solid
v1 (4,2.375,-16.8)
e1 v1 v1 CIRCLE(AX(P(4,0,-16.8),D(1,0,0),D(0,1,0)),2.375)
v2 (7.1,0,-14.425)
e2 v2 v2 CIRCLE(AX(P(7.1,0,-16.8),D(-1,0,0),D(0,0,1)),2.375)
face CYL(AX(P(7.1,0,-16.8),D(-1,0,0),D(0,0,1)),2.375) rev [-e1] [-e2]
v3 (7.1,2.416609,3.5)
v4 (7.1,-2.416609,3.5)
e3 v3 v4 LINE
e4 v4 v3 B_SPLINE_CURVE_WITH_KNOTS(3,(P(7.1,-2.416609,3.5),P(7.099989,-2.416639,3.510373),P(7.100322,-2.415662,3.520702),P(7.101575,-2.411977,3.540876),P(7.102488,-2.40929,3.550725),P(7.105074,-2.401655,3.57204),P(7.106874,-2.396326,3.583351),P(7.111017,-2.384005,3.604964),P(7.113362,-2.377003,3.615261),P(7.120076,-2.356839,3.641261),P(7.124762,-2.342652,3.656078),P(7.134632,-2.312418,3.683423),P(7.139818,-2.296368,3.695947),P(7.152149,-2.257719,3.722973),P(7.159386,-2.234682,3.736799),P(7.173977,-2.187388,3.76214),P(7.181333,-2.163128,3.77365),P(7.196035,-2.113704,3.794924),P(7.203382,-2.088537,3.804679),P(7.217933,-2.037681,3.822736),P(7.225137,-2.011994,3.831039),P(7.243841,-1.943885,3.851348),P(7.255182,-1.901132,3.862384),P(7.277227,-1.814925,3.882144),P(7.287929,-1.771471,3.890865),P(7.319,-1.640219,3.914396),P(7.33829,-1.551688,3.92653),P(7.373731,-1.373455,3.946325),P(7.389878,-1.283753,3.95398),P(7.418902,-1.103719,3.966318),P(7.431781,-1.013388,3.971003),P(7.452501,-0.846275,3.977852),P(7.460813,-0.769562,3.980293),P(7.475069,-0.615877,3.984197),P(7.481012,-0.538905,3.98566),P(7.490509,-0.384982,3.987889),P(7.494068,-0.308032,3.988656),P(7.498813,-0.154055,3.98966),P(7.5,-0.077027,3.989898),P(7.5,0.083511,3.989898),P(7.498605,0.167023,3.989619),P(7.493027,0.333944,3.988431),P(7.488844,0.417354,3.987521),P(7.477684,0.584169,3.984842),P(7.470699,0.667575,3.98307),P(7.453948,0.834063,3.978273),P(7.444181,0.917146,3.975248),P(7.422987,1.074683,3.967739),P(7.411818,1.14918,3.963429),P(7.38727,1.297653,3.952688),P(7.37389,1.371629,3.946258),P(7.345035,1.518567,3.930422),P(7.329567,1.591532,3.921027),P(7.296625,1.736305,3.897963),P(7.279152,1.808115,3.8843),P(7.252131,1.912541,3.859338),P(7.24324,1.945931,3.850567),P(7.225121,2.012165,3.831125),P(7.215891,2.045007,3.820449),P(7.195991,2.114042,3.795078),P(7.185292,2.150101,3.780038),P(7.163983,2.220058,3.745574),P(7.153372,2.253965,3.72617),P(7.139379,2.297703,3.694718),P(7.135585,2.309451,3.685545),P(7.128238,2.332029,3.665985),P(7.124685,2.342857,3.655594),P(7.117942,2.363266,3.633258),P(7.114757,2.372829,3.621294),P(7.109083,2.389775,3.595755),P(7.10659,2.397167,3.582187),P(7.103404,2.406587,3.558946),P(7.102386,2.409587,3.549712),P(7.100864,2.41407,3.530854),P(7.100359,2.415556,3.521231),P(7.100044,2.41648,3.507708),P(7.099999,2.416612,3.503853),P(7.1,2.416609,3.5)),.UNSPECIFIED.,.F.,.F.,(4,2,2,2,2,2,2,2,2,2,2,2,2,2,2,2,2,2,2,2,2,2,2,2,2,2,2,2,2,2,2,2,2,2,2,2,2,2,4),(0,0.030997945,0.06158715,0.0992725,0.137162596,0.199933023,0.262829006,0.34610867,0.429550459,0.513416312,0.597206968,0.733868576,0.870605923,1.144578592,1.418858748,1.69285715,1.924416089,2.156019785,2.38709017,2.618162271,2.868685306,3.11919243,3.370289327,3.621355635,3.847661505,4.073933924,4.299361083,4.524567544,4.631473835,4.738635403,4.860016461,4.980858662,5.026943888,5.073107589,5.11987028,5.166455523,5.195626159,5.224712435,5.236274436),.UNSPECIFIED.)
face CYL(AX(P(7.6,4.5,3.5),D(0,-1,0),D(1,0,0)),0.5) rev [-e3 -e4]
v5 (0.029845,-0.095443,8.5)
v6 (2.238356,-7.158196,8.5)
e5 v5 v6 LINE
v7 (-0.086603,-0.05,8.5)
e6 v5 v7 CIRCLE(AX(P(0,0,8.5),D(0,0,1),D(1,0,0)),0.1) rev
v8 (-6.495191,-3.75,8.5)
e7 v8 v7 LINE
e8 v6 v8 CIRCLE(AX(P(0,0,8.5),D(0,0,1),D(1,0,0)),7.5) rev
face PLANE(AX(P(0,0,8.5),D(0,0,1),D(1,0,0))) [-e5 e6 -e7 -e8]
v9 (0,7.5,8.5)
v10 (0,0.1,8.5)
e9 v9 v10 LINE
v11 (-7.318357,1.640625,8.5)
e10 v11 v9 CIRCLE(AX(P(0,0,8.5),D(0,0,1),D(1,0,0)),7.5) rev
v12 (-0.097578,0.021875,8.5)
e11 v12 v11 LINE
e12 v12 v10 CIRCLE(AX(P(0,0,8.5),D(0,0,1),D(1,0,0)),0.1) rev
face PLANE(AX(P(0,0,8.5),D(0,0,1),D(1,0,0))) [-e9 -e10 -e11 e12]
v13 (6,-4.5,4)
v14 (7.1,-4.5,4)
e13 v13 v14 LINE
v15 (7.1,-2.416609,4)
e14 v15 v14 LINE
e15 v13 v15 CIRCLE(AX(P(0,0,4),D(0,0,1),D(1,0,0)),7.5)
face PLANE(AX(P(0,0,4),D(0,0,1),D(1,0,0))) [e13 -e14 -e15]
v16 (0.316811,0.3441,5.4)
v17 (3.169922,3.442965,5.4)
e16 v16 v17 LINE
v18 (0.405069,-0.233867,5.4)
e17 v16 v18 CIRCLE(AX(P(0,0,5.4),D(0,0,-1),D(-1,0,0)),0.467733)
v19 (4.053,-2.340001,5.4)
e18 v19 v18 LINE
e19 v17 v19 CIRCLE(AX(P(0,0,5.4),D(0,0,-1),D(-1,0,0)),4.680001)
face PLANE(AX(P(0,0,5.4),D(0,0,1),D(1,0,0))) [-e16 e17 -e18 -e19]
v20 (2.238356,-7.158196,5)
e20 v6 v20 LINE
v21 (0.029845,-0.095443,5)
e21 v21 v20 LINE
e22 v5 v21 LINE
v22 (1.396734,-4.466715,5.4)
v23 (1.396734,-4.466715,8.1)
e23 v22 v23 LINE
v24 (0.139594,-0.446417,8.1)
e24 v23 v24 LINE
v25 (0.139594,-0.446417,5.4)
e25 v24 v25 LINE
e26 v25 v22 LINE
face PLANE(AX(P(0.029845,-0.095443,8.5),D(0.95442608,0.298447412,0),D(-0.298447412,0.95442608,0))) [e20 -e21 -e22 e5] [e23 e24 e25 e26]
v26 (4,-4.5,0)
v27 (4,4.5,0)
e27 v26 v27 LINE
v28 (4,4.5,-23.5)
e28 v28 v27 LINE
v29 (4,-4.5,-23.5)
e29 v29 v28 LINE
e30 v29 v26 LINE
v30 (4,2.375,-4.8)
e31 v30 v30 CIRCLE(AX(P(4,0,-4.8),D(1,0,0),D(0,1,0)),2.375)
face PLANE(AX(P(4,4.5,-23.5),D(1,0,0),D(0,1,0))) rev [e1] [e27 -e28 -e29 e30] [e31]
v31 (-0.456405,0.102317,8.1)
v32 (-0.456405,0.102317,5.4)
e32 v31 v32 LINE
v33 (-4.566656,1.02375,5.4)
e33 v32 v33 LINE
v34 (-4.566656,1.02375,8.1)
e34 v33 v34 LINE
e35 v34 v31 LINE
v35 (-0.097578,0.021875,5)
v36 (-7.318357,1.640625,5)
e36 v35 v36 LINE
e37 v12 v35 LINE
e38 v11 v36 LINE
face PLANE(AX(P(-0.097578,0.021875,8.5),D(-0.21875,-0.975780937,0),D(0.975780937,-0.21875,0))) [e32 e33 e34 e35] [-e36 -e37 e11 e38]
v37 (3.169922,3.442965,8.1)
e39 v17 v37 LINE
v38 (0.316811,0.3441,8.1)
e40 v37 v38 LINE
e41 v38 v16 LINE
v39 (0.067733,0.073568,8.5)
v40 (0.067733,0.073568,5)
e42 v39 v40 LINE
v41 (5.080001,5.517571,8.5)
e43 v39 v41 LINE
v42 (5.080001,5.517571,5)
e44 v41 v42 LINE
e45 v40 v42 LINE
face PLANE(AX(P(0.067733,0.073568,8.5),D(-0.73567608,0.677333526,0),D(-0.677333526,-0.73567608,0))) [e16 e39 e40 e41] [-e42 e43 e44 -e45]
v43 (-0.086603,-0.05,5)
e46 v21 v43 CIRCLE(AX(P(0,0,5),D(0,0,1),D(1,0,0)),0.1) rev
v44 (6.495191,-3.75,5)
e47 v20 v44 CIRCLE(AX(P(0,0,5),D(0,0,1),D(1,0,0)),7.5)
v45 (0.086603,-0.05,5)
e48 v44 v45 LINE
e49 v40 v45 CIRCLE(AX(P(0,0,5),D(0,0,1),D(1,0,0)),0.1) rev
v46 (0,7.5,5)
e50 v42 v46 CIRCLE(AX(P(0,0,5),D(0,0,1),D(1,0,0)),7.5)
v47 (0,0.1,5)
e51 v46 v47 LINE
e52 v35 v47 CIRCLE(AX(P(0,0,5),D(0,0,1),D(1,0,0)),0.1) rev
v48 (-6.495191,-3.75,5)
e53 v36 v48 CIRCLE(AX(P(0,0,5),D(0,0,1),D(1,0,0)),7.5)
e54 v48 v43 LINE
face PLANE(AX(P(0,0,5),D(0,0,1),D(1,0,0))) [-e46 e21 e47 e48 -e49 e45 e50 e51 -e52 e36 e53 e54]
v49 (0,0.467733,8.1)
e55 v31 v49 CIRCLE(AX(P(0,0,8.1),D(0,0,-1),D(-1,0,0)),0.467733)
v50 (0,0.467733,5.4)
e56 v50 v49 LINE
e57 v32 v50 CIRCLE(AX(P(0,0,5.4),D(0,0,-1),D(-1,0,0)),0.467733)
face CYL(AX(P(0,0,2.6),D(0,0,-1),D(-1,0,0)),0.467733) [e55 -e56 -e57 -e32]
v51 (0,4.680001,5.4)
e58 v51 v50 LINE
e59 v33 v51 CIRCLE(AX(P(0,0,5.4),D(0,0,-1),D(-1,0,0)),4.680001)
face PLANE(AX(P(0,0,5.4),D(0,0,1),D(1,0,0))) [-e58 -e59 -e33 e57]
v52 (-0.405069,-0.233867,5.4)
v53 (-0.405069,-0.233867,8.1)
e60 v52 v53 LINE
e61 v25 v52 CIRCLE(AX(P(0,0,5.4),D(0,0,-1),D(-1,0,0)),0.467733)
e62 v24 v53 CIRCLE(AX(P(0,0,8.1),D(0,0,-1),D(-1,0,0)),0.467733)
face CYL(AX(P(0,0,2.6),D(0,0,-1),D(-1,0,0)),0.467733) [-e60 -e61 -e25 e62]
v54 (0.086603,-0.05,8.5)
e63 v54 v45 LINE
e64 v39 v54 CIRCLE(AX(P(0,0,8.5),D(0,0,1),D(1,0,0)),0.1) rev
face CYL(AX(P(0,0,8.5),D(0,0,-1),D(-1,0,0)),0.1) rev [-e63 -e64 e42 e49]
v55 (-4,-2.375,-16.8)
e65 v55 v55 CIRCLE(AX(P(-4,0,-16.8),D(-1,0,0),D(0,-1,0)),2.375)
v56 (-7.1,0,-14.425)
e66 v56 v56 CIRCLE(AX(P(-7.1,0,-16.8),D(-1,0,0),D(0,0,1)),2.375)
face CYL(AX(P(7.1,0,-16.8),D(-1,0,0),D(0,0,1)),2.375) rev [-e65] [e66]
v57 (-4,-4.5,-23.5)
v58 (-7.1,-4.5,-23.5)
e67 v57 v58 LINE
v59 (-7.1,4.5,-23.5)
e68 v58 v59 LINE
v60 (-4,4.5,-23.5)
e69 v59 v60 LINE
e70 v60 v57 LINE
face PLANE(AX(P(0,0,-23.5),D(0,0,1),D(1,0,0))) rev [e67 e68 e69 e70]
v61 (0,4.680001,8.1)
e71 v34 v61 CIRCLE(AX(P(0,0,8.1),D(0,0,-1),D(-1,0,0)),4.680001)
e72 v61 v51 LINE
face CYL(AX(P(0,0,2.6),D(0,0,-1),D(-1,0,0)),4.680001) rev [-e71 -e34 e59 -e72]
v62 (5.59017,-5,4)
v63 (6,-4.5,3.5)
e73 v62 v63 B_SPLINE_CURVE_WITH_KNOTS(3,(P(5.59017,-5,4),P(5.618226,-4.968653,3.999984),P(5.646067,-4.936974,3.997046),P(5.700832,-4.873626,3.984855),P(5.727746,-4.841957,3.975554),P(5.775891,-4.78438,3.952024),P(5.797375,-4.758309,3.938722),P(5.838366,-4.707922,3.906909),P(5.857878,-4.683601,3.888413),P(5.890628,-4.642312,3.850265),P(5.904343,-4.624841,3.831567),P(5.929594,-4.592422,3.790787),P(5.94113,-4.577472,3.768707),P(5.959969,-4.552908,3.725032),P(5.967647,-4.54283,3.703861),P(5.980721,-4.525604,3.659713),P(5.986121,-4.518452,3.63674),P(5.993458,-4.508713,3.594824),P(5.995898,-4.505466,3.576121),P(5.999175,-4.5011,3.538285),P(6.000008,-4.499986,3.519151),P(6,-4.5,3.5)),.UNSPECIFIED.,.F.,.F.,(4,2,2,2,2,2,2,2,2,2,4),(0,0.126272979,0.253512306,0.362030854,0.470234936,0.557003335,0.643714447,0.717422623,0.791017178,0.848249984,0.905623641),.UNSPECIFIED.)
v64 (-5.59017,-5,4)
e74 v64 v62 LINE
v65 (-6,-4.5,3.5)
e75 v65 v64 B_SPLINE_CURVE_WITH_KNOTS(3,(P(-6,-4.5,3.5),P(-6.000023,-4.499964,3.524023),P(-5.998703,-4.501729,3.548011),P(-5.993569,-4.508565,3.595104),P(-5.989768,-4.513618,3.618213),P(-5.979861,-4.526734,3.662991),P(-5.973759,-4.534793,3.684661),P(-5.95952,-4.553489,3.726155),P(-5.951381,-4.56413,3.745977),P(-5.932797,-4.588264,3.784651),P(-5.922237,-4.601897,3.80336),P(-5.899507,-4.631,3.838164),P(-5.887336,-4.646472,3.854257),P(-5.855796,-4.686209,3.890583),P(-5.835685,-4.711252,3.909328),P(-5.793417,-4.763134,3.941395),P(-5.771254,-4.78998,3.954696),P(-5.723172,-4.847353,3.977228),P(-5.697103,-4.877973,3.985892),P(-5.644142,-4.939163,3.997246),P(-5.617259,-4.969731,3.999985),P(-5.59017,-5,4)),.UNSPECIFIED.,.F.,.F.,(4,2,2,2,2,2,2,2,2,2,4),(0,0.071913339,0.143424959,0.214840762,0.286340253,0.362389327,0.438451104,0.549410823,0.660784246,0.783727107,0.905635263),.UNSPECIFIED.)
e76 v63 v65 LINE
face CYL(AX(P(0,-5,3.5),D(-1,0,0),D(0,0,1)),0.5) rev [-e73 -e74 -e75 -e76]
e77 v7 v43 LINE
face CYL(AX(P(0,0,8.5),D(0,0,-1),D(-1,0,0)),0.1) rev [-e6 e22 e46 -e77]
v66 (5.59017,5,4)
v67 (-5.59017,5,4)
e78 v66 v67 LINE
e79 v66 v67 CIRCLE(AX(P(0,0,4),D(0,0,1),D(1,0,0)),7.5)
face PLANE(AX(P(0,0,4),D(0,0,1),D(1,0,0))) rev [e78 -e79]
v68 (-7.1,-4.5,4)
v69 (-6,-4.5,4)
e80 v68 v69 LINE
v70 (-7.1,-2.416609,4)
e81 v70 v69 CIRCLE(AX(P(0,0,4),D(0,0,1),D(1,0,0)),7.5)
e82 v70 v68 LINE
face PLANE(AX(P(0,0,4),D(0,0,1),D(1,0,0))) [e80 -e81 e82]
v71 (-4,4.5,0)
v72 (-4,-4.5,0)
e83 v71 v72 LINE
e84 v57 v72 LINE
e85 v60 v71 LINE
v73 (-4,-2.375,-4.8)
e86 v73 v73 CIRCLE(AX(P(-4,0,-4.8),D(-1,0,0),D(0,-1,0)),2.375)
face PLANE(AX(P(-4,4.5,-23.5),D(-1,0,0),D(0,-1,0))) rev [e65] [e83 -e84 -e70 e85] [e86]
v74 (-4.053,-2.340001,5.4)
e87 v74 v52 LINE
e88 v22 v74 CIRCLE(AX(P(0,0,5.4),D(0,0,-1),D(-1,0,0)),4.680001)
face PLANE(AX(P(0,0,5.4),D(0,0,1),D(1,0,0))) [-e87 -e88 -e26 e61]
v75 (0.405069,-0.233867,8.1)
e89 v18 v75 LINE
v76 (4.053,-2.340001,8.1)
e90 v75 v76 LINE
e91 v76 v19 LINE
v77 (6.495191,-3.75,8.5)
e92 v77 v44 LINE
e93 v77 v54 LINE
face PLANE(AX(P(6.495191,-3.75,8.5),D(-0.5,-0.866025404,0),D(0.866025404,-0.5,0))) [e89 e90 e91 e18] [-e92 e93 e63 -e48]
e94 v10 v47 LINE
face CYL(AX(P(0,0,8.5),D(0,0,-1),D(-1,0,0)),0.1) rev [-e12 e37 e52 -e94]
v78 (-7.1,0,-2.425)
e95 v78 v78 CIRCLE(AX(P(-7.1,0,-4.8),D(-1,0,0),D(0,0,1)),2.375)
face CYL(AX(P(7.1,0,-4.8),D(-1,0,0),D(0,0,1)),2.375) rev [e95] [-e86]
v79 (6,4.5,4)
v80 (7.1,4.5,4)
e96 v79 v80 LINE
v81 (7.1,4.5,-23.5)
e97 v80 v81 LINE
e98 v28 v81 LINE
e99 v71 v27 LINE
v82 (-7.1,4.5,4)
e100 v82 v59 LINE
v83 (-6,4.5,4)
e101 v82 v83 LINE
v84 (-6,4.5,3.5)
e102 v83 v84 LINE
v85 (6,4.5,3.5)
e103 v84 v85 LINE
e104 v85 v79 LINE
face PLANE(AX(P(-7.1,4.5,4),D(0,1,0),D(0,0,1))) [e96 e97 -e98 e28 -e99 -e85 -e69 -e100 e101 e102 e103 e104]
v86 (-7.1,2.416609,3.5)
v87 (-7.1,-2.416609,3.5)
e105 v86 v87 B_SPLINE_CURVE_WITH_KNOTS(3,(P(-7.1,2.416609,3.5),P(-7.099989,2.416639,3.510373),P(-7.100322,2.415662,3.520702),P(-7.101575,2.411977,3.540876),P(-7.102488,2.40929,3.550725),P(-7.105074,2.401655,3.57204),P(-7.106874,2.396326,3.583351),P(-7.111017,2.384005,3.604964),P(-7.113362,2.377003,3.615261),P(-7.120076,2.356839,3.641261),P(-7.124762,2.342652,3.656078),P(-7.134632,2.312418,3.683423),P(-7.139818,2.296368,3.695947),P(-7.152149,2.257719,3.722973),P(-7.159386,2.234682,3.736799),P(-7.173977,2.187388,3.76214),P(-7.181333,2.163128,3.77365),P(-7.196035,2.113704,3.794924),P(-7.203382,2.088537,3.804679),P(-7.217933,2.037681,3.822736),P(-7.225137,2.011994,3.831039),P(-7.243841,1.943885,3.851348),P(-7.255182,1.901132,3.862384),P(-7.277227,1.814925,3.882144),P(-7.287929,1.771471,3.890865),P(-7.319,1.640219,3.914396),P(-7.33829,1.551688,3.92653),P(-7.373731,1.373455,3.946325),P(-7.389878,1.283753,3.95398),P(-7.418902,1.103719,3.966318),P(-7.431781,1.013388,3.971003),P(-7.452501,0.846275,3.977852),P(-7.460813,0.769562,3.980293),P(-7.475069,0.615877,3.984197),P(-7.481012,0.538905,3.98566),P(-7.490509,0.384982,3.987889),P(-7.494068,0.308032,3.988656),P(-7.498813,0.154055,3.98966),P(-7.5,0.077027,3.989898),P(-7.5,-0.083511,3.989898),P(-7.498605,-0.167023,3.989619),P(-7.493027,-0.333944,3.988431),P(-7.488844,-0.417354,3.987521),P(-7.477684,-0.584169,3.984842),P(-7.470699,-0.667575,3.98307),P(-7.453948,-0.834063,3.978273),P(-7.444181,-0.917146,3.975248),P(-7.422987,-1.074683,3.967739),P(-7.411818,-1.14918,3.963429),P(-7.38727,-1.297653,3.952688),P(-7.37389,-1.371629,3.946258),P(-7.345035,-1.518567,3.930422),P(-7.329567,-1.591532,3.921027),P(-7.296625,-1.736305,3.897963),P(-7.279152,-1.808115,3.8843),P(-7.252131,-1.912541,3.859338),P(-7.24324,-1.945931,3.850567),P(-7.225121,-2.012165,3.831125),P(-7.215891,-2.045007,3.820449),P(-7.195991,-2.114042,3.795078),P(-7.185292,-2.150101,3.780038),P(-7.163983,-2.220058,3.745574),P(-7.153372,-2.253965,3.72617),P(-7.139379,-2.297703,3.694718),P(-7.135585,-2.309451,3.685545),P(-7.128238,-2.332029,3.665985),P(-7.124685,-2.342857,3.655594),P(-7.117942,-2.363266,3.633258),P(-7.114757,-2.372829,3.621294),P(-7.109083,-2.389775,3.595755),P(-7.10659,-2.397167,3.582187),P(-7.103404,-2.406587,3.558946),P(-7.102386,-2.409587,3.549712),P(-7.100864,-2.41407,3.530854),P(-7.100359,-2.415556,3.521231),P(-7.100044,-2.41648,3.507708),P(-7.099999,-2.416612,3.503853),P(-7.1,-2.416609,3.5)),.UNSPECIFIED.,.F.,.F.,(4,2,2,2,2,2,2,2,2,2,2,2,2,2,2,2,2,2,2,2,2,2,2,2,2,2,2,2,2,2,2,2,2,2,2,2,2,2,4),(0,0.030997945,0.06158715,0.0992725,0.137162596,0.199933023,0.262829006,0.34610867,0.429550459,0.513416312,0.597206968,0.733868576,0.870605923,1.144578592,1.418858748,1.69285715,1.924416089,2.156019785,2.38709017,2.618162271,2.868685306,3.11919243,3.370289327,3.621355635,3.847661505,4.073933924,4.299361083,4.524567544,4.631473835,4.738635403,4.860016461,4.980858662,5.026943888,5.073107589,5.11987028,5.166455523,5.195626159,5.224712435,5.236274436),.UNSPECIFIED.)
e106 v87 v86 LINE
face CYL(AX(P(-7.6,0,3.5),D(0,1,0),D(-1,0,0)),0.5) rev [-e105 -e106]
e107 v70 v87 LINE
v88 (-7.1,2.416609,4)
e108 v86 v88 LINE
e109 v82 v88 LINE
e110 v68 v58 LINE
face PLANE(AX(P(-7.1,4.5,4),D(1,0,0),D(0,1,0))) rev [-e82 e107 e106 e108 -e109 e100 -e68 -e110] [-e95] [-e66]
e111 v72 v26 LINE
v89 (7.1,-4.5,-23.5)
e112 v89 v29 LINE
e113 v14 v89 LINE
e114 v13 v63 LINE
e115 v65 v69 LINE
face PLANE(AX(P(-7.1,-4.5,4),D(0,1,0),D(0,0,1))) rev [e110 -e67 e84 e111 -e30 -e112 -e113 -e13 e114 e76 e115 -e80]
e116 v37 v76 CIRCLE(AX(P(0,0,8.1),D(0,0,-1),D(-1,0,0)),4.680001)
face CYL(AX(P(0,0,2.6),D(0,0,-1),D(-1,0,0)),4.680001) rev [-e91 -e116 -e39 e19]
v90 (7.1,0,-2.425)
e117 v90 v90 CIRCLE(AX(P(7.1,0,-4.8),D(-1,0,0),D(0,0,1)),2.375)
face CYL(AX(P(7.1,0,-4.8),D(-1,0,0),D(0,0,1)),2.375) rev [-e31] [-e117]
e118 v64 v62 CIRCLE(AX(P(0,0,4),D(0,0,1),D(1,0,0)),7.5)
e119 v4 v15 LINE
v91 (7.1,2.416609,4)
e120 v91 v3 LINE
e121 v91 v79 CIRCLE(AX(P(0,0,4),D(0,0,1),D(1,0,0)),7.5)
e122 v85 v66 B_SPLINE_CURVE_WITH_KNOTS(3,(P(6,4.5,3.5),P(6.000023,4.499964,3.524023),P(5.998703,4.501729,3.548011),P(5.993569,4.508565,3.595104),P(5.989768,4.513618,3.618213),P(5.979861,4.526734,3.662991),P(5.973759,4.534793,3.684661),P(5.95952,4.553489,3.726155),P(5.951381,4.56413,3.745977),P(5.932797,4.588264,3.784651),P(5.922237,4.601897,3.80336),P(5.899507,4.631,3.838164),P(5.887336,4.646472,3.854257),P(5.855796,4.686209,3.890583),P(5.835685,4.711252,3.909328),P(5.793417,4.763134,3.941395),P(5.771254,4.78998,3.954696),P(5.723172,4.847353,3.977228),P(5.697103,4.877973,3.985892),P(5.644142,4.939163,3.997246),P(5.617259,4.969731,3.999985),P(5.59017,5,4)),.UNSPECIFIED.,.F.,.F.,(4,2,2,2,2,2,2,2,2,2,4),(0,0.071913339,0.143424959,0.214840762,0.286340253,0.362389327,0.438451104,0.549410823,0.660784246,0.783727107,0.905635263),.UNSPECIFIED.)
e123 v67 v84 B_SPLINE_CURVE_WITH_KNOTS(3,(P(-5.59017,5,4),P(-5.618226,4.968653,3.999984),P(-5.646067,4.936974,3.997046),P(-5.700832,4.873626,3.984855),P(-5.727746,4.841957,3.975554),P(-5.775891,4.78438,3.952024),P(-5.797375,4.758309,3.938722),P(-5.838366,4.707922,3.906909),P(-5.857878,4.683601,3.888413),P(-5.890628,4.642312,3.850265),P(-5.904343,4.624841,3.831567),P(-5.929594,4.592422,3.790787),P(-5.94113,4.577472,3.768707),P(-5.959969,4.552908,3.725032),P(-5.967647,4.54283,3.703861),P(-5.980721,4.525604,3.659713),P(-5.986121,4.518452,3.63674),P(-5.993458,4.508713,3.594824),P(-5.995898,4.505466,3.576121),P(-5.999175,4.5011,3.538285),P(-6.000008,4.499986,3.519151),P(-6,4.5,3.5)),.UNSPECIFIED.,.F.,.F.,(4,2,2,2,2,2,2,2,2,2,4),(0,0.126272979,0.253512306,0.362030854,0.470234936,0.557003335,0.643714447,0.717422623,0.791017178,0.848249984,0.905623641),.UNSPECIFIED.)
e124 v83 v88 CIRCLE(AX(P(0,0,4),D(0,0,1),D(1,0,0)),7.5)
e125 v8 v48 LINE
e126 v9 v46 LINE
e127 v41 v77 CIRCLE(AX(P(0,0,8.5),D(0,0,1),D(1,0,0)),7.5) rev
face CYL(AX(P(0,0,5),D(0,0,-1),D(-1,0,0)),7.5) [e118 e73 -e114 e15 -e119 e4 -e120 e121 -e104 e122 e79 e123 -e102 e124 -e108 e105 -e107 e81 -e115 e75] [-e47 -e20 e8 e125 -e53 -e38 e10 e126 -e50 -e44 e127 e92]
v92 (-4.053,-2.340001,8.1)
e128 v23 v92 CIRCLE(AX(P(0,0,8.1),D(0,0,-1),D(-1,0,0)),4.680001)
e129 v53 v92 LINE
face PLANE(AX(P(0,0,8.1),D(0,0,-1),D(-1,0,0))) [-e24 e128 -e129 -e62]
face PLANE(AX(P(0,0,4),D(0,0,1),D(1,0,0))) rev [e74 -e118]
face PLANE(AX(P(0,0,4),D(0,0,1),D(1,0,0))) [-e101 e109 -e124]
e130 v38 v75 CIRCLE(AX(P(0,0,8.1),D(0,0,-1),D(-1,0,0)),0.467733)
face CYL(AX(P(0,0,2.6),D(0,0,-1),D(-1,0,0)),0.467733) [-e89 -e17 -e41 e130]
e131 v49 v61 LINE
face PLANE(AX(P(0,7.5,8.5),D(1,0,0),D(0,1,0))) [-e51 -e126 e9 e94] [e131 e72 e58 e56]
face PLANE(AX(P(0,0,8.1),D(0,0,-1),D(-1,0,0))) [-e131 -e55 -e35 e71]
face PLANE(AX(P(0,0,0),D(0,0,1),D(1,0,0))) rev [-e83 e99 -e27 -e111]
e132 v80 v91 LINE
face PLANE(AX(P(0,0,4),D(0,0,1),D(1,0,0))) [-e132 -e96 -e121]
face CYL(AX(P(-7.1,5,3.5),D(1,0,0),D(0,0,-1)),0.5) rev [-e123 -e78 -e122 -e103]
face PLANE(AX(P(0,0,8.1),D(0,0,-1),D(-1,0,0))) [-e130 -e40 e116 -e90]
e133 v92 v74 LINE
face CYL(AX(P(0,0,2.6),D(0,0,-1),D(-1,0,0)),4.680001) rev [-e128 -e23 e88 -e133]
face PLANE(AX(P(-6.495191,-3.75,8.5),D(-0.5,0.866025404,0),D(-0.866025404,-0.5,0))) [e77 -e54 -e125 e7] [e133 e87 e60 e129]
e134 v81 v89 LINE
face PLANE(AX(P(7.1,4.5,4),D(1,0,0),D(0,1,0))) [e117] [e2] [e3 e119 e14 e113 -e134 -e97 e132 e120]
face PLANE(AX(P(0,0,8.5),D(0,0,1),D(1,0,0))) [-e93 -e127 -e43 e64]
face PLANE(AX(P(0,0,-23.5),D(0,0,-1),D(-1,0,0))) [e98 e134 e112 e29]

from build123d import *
from build123d.topology import SkipClean

# Parameters (mm, degrees)
ESQUISSE1_W             = 14.2
ESQUISSE1_H             = 9
BOSS_EXTRU_3_DEPTH      = 4
ESQUISSE4_W             = 3.1
ESQUISSE4_H             = 9
BOSS_EXTRU_4_DEPTH      = 23.5
ESQUISSE5_R             = 2.375
ENL_V_MAT_EXTRU_2_DEPTH = 28.823371471
ESQUISSE6_R             = 7.5
BOSS_EXTRU_5_DEPTH      = 1
CONG_1_R                = 0.5
EXTRU_MINCE1_DEPTH      = 3.5
ESQUISSE10_R            = 0.5
ESQUISSE10_W            = 4.21226809
ESQUISSE10_H            = 2.7


with BuildPart() as part:
    # Esquisse1 → Boss.-Extru.3 (new body)
    with BuildSketch(Plane.XY):
        Rectangle(ESQUISSE1_W, ESQUISSE1_H)
    extrude(amount=BOSS_EXTRU_3_DEPTH)

    # Esquisse4 → Boss.-Extru.4 (add)
    with BuildSketch(Plane(origin=(0, 0, 0), x_dir=(-1, 0, 0), z_dir=(0, 0, -1))):
        with Locations((5.55, 0)):
            Rectangle(ESQUISSE4_W, ESQUISSE4_H)
        with Locations((-5.55, 0)):
            Rectangle(ESQUISSE4_W, ESQUISSE4_H)
    extrude(amount=BOSS_EXTRU_4_DEPTH)

    # Esquisse5 → Enlèv. mat.-Extru.2 (cut, through all)
    with BuildSketch(Plane.ZY.offset(7.1)):
        with Locations((-16.8, 0)):
            Circle(ESQUISSE5_R)
        with Locations((-4.8, 0)):
            Circle(ESQUISSE5_R)
    extrude(amount=-ENL_V_MAT_EXTRU_2_DEPTH, mode=Mode.SUBTRACT)

    # Esquisse6 → Boss.-Extru.5 (add)
    with BuildSketch(Plane.XY.offset(4)):
        with Locations(Location((0, 0, 0), (0, 0, 161.203094965))):
            Circle(ESQUISSE6_R)
    extrude(amount=BOSS_EXTRU_5_DEPTH)

    # Congé1
    # the kernel refuses this fillet: 0.5 mm, written as the material it adds along each edge
    with BuildSketch(Plane(origin=(-7.1, -3.666609195, 4), x_dir=(0, 0, -1), z_dir=(0, 1, 0))) as cong_1_piece_1_section:
        with BuildLine():
            CenterArc((CONG_1_R, CONG_1_R), CONG_1_R, 180, 90)
            Line((0, CONG_1_R), (0, 0))
            Line((0, 0), (CONG_1_R, 0))
        make_face()
    cong_1_piece_1 = extrude(amount=7.333218389, mode=Mode.PRIVATE)
    cong_1_piece_1 = cong_1_piece_1 & Plane(origin=(0, 0, 3.878104255), x_dir=(-0.946666666666828, 0.3222145592953816, 0), z_dir=(0, 0, -1)) * Cylinder(7.5, 17, mode=Mode.PRIVATE)
    add(cong_1_piece_1)
    with BuildSketch(Plane(origin=(7.25, -4.5, 4), x_dir=(0, 0, -1), z_dir=(-1, 0, 0))) as cong_1_piece_2_section:
        with BuildLine():
            CenterArc((CONG_1_R, CONG_1_R), CONG_1_R, 180, 90)
            Line((0, CONG_1_R), (0, 0))
            Line((0, 0), (CONG_1_R, 0))
        make_face()
    cong_1_piece_2 = extrude(amount=14.5, mode=Mode.PRIVATE)
    cong_1_piece_2 = cong_1_piece_2 & Plane(origin=(0, 0, 3.887627019), x_dir=(-0.946666666666828, 0.3222145592953816, 0), z_dir=(0, 0, -1)) * Cylinder(7.5, 32, mode=Mode.PRIVATE)
    add(cong_1_piece_2)
    with BuildSketch(Plane(origin=(7.1, 3.666609195, 4), x_dir=(0, 0, -1), z_dir=(0, -1, 0))) as cong_1_piece_3_section:
        with BuildLine():
            CenterArc((CONG_1_R, CONG_1_R), CONG_1_R, 180, 90)
            Line((0, CONG_1_R), (0, 0))
            Line((0, 0), (CONG_1_R, 0))
        make_face()
    cong_1_piece_3 = extrude(amount=7.333218389, mode=Mode.PRIVATE)
    cong_1_piece_3 = cong_1_piece_3 & Plane(origin=(0, 0, 3.87809802), x_dir=(-0.946666666666828, 0.3222145592953816, 0), z_dir=(0, 0, -1)) * Cylinder(7.5, 17, mode=Mode.PRIVATE)
    add(cong_1_piece_3)
    with BuildSketch(Plane(origin=(-7.25, 4.5, 4), x_dir=(0, 0, -1), z_dir=(1, 0, 0))) as cong_1_piece_4_section:
        with BuildLine():
            CenterArc((CONG_1_R, CONG_1_R), CONG_1_R, 180, 90)
            Line((0, CONG_1_R), (0, 0))
            Line((0, 0), (CONG_1_R, 0))
        make_face()
    cong_1_piece_4 = extrude(amount=14.5, mode=Mode.PRIVATE)
    cong_1_piece_4 = cong_1_piece_4 & Plane(origin=(0, 0, 3.88762702), x_dir=(-0.946666666666828, 0.3222145592953816, 0), z_dir=(0, 0, -1)) * Cylinder(7.5, 32, mode=Mode.PRIVATE)
    add(cong_1_piece_4)

    # Esquisse8 → Extru.-Mince1 (add)
    with SkipClean():  # the faces are left unmerged after this step: merging them gives an invalid solid
        with BuildSketch(Plane.XY.offset(5)):
            with BuildLine():
                ThreePointArc((5.080001443, 5.517570601), (7.414056481, 1.132151268), (6.495190528, -3.75))
                Line((6.495190528, -3.75), (0.08660254, -0.05))
                ThreePointArc((0.08660254, -0.05), (0.098854086, 0.01509535), (0.067733353, 0.073567608))
                Line((0.067733353, 0.073567608), (5.080001443, 5.517570601))
            make_face()
            with BuildLine():
                ThreePointArc((2.238355587, -7.158195601), (-2.726556481, -6.986836892), (-6.495190528, -3.75))
                Line((-6.495190528, -3.75), (-0.08660254, -0.05))
                ThreePointArc((-0.08660254, -0.05), (-0.036354086, -0.093157825), (0.029844741, -0.095442608))
                Line((0.029844741, -0.095442608), (2.238355587, -7.158195601))
            make_face()
            with BuildLine():
                ThreePointArc((-7.318357029, 1.640625), (-4.6875, 5.854685623), (0, 7.5))
                Line((0, 7.5), (0, 0.1))
                ThreePointArc((0, 0.1), (-0.0625, 0.078062475), (-0.097578094, 0.021875))
                Line((-0.097578094, 0.021875), (-7.318357029, 1.640625))
            make_face()
        extrude(amount=EXTRU_MINCE1_DEPTH)
    add(part.part.scale(1), mode=Mode.REPLACE)  # the faces are merged on a copy

    # Esquisse10 → Enlèvement de matière-Révolution1 (revolve, cut)
    with BuildSketch(Plane(origin=(0, 0, 0), x_dir=(1, 0, 0), z_dir=(0, 1, 0)), mode=Mode.PRIVATE) as enl_vement_de_mati_re_r_volution1_sk:
        with Locations((-4, -6.75)):
            Circle(ESQUISSE10_R)
        with Locations((2.573867398, -6.75)):
            Rectangle(ESQUISSE10_W, ESQUISSE10_H)
    revolve(enl_vement_de_mati_re_r_volution1_sk.sketch.rotate(Axis((0, 0, 2.6), (0, 0, 1)), 347.364374907), axis=Axis((0, 0, 2.6), (0, 0, 1)), mode=Mode.SUBTRACT)


solid = part.part
